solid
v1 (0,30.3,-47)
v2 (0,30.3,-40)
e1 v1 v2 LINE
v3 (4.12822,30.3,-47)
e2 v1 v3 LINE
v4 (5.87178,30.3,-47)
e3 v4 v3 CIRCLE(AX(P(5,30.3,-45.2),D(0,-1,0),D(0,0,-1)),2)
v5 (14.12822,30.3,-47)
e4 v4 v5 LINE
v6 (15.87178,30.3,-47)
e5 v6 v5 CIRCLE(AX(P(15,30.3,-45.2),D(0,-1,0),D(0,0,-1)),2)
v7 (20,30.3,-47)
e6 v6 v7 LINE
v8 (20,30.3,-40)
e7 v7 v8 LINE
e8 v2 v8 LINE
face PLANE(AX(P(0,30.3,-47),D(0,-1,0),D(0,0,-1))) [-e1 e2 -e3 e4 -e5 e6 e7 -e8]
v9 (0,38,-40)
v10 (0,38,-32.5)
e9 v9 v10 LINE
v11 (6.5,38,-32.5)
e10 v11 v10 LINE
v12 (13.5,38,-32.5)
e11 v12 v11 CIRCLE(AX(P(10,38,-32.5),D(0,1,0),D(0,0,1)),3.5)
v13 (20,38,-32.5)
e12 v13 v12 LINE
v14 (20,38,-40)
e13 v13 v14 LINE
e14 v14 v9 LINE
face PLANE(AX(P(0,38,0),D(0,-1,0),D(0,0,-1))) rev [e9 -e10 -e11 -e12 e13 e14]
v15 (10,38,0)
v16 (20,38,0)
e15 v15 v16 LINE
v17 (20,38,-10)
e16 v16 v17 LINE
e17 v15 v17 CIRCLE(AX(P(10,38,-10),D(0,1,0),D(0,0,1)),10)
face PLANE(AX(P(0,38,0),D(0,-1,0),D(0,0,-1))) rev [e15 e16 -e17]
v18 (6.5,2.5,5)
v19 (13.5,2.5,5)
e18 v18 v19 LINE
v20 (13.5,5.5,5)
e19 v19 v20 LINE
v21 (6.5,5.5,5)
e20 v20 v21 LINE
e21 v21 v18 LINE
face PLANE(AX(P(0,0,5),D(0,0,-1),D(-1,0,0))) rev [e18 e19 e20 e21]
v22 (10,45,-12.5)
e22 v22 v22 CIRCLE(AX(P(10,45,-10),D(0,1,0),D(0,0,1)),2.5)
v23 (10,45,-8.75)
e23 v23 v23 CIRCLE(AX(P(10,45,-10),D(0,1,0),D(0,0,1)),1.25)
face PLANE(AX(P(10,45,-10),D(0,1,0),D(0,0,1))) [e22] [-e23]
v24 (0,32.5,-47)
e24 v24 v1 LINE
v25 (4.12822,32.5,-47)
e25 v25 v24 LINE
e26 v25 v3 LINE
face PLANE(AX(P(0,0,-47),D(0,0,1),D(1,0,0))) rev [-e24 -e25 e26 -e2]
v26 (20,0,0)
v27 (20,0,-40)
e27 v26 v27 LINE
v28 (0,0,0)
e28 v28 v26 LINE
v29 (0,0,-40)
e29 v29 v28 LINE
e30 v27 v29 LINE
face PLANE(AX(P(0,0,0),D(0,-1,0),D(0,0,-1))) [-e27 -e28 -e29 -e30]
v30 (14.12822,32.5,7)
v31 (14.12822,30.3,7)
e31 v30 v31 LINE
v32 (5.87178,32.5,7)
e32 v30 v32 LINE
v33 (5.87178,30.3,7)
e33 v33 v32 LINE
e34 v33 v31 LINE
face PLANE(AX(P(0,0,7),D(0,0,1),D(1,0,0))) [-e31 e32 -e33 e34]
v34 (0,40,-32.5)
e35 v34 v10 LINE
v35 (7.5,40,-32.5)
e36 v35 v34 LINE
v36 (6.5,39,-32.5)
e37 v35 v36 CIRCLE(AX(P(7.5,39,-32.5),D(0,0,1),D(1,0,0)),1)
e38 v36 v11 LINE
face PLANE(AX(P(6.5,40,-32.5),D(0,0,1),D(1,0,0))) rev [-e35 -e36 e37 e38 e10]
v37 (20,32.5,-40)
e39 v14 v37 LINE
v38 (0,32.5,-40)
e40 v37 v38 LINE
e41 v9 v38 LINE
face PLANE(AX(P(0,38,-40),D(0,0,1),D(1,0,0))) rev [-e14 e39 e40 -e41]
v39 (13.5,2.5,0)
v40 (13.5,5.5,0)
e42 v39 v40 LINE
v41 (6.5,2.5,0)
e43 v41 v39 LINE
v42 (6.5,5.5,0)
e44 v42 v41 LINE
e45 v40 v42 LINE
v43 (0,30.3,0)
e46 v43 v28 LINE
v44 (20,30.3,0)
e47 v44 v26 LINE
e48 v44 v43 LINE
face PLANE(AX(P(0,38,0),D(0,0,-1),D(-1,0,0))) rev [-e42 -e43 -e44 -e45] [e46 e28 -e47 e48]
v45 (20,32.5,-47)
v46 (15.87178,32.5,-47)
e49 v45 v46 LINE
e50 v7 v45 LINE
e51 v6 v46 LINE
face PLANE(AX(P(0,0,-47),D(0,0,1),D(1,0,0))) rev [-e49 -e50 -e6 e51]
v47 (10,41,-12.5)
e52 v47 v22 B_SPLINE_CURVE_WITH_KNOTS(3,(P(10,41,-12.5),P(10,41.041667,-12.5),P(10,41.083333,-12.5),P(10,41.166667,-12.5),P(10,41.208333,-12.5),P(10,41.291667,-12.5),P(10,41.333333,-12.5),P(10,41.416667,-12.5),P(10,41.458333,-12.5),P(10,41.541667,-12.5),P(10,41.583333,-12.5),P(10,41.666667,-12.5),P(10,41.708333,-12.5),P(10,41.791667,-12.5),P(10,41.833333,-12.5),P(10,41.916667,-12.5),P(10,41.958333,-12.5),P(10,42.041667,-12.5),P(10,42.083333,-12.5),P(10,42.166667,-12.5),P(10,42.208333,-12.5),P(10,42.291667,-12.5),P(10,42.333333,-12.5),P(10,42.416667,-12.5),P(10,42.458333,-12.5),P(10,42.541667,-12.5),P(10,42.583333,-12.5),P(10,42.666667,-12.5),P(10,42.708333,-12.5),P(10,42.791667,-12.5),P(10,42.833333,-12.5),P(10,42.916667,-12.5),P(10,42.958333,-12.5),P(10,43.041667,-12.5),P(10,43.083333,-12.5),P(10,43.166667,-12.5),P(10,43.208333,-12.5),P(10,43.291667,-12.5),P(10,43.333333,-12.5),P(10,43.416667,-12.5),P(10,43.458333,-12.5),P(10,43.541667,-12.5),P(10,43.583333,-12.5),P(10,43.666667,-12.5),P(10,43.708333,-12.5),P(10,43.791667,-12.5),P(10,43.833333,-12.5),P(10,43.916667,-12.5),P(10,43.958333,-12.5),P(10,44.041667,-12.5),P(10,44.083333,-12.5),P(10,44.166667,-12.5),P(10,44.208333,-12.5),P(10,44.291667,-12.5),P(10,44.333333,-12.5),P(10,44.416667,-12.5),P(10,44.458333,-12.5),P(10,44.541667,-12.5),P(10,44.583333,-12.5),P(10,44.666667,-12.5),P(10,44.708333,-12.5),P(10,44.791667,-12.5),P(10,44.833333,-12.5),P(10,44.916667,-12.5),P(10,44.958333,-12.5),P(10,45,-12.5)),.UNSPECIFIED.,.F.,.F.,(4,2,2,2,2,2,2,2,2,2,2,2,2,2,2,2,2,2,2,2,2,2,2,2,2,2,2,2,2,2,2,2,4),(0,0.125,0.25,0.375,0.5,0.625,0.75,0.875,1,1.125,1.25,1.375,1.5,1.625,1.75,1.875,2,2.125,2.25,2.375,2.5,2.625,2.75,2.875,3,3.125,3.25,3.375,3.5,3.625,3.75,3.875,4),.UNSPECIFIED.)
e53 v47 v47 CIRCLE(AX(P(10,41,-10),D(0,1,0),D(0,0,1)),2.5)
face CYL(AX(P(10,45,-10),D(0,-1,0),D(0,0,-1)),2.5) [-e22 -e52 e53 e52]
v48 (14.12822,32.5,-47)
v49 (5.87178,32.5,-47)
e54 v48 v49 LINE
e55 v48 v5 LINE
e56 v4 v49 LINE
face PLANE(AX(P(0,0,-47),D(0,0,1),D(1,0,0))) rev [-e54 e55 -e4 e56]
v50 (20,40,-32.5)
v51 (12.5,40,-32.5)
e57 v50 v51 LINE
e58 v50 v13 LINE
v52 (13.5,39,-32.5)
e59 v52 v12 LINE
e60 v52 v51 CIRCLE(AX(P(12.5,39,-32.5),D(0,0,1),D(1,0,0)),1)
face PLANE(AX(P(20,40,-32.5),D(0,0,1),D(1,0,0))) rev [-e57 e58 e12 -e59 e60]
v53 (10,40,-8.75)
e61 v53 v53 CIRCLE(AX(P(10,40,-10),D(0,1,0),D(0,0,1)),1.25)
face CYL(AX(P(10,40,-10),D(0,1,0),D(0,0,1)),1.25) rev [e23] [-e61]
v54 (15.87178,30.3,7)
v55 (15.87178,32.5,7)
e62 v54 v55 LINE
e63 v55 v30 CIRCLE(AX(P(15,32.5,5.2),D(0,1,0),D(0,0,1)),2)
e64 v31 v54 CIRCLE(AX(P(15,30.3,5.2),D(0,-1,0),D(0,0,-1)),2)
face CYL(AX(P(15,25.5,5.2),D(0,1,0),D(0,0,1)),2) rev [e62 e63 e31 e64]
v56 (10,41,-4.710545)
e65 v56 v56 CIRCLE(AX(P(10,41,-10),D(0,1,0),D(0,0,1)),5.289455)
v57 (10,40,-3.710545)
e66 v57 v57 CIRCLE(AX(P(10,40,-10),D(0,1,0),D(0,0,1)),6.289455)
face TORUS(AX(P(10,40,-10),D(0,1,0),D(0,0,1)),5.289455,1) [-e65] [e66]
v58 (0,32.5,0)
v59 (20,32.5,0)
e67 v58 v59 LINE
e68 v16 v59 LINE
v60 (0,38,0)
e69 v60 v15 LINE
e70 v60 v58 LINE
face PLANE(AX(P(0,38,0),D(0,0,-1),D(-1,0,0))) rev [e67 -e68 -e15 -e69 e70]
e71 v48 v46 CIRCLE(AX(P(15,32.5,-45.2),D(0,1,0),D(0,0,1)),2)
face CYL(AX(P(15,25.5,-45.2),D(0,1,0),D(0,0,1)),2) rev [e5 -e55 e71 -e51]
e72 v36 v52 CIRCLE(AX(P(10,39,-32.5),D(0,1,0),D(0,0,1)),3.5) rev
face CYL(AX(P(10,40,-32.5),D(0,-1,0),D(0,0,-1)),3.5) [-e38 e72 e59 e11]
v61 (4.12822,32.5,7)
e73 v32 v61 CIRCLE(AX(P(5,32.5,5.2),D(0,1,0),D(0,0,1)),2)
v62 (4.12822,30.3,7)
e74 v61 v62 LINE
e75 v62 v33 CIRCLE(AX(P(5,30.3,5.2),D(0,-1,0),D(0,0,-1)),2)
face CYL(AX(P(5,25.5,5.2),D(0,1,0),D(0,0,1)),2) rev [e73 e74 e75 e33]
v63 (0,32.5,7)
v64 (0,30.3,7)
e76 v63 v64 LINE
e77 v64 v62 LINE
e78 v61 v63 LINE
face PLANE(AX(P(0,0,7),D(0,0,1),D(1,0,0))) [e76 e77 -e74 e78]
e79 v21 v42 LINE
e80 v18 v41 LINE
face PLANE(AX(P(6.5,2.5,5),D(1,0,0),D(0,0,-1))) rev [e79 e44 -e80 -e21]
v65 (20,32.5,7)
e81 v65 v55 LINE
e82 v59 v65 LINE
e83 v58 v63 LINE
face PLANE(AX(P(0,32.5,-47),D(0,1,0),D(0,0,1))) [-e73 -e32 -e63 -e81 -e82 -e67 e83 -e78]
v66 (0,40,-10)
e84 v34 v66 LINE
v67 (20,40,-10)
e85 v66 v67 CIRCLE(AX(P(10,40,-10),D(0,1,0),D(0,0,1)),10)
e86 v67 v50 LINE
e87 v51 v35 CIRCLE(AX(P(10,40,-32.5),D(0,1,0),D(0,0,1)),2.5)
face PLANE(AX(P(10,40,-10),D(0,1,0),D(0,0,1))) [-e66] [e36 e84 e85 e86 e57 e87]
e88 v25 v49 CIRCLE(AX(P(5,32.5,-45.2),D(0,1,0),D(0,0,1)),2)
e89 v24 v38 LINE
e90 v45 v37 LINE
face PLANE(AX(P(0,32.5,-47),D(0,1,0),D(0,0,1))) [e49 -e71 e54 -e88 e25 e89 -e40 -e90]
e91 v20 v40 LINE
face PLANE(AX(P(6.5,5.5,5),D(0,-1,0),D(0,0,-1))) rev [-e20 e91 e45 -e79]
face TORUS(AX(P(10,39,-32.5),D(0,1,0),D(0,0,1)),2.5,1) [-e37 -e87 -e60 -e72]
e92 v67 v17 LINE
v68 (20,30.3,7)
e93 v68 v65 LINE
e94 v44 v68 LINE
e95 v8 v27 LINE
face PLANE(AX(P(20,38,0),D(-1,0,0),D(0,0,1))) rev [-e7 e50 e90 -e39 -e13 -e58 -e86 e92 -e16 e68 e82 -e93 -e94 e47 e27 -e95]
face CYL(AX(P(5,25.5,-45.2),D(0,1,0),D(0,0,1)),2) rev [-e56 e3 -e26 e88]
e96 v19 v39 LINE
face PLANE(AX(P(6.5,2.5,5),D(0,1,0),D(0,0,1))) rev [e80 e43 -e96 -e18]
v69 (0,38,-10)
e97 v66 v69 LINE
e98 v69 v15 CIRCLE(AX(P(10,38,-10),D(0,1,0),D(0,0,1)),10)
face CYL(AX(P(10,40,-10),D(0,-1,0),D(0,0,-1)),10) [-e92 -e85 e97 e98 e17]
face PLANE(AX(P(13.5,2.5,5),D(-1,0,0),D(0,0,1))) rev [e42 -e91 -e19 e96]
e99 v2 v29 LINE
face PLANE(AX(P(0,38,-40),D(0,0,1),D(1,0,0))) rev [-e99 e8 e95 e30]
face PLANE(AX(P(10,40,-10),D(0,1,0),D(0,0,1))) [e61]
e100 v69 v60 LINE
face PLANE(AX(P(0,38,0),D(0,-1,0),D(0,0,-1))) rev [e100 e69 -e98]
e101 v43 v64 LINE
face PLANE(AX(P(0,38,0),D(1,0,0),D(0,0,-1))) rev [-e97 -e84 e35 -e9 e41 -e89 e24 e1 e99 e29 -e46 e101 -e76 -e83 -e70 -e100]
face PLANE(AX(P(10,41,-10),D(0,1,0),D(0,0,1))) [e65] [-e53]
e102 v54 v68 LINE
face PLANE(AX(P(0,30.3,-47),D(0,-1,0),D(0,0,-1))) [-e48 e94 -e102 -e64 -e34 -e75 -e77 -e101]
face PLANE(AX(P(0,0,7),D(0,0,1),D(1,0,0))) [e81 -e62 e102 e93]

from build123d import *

# Parameters (mm, degrees)
SKETCH1_W                = 20
SKETCH1_H                = 40
BOSS_EXTRUDE1_DEPTH      = 38
SKETCH2_W                = 7
SKETCH2_H                = 3
BOSS_EXTRUDE2_DEPTH      = 5
SKETCH3_R                = 2.5
BOSS_EXTRUDE3_DEPTH      = 7
BOSS_EXTRUDE4_DEPTH      = 7
BOSS_EXTRUDE4_DEPTH_BACK = 47
SKETCH4_W                = 20
SKETCH4_H                = 2.2
SKETCH5_R                = 2
CUT_EXTRUDE1_DEPTH       = 7
BOSS_EXTRUDE5_DEPTH      = 2
SKETCH7_R                = 6.289454611
BOSS_EXTRUDE6_DEPTH      = 1
FILLET1_R                = 1
FILLET2_R                = 1
SKETCH8_R                = 1.25
CUT_EXTRUDE2_DEPTH       = 5


with BuildPart() as part:
    # Sketch1 → Boss-Extrude1 (new body)
    with BuildSketch(Plane(origin=(0, 0, 0), x_dir=(1, 0, 0), z_dir=(0, 1, 0))):
        with Locations((10, 20)):
            Rectangle(SKETCH1_W, SKETCH1_H)
    extrude(amount=BOSS_EXTRUDE1_DEPTH)

    # Sketch2 → Boss-Extrude2 (add)
    with BuildSketch(Plane.XY):
        with Locations((10, 4)):
            Rectangle(SKETCH2_W, SKETCH2_H)
    extrude(amount=BOSS_EXTRUDE2_DEPTH)

    # Sketch3 → Boss-Extrude3 (add)
    with BuildSketch(Plane(origin=(0, 38, 0), x_dir=(1, 0, 0), z_dir=(0, 1, 0))):
        with Locations(Location((10, 10, 0), (0, 0, 90))):
            Circle(SKETCH3_R)
    extrude(amount=BOSS_EXTRUDE3_DEPTH)

    # Sketch4 → Boss-Extrude4 (add, two sides: drawn at the far end of the back side and taken through both)
    with BuildSketch(Plane.XY.offset(-BOSS_EXTRUDE4_DEPTH_BACK)):
        with Locations((10, 31.4)):
            Rectangle(SKETCH4_W, SKETCH4_H)
    extrude(amount=BOSS_EXTRUDE4_DEPTH + BOSS_EXTRUDE4_DEPTH_BACK)

    # Sketch5 → Cut-Extrude1 (cut)
    with BuildSketch(Plane(origin=(0, 32.5, 0), x_dir=(1, 0, 0), z_dir=(0, 1, 0))):
        with Locations((15, 45.2)):
            Circle(SKETCH5_R)
        with Locations((5, 45.2)):
            Circle(SKETCH5_R)
        with Locations((15, -5.2)):
            Circle(SKETCH5_R)
        with Locations((5, -5.2)):
            Circle(SKETCH5_R)
    extrude(amount=-CUT_EXTRUDE1_DEPTH, mode=Mode.SUBTRACT)

    # Sketch6 → Boss-Extrude5 (add)
    with BuildSketch(Plane(origin=(0, 38, 0), x_dir=(1, 0, 0), z_dir=(0, 1, 0))):
        with BuildLine():
            Line((20, 32.5), (13.5, 32.5))
            ThreePointArc((13.5, 32.5), (10, 36), (6.5, 32.5))
            Line((6.5, 32.5), (0, 32.5))
            Line((0, 32.5), (0, 10))
            ThreePointArc((0, 10), (10, 0), (20, 10))
            Line((20, 10), (20, 32.5))
        make_face()
    extrude(amount=BOSS_EXTRUDE5_DEPTH)

    # Sketch7 → Boss-Extrude6 (add)
    with BuildSketch(Plane(origin=(0, 40, 0), x_dir=(1, 0, 0), z_dir=(0, 1, 0))):
        with Locations(Location((10, 10, 0), (0, 0, 270))):
            Circle(SKETCH7_R)
    extrude(amount=BOSS_EXTRUDE6_DEPTH)

    # Fillet1
    fillet1_edges = [part.edges().sort_by_distance(p)[0] for p in [
        (10, 41, -16.289454611),
    ]]
    fillet(fillet1_edges, radius=FILLET1_R - 0.0001)  # a hair under: the kernel refuses the full size

    # Fillet2
    fillet2_edges = [part.edges().sort_by_distance(p)[0] for p in [
        (10, 40, -36),
    ]]
    fillet(fillet2_edges, radius=FILLET2_R)

    # Sketch8 → Cut-Extrude2 (cut)
    with BuildSketch(Plane(origin=(0, 45, 0), x_dir=(1, 0, 0), z_dir=(0, 1, 0))):
        with Locations(Location((10, 10, 0), (0, 0, 270))):
            Circle(SKETCH8_R)
    extrude(amount=-CUT_EXTRUDE2_DEPTH, mode=Mode.SUBTRACT)


solid = part.part
